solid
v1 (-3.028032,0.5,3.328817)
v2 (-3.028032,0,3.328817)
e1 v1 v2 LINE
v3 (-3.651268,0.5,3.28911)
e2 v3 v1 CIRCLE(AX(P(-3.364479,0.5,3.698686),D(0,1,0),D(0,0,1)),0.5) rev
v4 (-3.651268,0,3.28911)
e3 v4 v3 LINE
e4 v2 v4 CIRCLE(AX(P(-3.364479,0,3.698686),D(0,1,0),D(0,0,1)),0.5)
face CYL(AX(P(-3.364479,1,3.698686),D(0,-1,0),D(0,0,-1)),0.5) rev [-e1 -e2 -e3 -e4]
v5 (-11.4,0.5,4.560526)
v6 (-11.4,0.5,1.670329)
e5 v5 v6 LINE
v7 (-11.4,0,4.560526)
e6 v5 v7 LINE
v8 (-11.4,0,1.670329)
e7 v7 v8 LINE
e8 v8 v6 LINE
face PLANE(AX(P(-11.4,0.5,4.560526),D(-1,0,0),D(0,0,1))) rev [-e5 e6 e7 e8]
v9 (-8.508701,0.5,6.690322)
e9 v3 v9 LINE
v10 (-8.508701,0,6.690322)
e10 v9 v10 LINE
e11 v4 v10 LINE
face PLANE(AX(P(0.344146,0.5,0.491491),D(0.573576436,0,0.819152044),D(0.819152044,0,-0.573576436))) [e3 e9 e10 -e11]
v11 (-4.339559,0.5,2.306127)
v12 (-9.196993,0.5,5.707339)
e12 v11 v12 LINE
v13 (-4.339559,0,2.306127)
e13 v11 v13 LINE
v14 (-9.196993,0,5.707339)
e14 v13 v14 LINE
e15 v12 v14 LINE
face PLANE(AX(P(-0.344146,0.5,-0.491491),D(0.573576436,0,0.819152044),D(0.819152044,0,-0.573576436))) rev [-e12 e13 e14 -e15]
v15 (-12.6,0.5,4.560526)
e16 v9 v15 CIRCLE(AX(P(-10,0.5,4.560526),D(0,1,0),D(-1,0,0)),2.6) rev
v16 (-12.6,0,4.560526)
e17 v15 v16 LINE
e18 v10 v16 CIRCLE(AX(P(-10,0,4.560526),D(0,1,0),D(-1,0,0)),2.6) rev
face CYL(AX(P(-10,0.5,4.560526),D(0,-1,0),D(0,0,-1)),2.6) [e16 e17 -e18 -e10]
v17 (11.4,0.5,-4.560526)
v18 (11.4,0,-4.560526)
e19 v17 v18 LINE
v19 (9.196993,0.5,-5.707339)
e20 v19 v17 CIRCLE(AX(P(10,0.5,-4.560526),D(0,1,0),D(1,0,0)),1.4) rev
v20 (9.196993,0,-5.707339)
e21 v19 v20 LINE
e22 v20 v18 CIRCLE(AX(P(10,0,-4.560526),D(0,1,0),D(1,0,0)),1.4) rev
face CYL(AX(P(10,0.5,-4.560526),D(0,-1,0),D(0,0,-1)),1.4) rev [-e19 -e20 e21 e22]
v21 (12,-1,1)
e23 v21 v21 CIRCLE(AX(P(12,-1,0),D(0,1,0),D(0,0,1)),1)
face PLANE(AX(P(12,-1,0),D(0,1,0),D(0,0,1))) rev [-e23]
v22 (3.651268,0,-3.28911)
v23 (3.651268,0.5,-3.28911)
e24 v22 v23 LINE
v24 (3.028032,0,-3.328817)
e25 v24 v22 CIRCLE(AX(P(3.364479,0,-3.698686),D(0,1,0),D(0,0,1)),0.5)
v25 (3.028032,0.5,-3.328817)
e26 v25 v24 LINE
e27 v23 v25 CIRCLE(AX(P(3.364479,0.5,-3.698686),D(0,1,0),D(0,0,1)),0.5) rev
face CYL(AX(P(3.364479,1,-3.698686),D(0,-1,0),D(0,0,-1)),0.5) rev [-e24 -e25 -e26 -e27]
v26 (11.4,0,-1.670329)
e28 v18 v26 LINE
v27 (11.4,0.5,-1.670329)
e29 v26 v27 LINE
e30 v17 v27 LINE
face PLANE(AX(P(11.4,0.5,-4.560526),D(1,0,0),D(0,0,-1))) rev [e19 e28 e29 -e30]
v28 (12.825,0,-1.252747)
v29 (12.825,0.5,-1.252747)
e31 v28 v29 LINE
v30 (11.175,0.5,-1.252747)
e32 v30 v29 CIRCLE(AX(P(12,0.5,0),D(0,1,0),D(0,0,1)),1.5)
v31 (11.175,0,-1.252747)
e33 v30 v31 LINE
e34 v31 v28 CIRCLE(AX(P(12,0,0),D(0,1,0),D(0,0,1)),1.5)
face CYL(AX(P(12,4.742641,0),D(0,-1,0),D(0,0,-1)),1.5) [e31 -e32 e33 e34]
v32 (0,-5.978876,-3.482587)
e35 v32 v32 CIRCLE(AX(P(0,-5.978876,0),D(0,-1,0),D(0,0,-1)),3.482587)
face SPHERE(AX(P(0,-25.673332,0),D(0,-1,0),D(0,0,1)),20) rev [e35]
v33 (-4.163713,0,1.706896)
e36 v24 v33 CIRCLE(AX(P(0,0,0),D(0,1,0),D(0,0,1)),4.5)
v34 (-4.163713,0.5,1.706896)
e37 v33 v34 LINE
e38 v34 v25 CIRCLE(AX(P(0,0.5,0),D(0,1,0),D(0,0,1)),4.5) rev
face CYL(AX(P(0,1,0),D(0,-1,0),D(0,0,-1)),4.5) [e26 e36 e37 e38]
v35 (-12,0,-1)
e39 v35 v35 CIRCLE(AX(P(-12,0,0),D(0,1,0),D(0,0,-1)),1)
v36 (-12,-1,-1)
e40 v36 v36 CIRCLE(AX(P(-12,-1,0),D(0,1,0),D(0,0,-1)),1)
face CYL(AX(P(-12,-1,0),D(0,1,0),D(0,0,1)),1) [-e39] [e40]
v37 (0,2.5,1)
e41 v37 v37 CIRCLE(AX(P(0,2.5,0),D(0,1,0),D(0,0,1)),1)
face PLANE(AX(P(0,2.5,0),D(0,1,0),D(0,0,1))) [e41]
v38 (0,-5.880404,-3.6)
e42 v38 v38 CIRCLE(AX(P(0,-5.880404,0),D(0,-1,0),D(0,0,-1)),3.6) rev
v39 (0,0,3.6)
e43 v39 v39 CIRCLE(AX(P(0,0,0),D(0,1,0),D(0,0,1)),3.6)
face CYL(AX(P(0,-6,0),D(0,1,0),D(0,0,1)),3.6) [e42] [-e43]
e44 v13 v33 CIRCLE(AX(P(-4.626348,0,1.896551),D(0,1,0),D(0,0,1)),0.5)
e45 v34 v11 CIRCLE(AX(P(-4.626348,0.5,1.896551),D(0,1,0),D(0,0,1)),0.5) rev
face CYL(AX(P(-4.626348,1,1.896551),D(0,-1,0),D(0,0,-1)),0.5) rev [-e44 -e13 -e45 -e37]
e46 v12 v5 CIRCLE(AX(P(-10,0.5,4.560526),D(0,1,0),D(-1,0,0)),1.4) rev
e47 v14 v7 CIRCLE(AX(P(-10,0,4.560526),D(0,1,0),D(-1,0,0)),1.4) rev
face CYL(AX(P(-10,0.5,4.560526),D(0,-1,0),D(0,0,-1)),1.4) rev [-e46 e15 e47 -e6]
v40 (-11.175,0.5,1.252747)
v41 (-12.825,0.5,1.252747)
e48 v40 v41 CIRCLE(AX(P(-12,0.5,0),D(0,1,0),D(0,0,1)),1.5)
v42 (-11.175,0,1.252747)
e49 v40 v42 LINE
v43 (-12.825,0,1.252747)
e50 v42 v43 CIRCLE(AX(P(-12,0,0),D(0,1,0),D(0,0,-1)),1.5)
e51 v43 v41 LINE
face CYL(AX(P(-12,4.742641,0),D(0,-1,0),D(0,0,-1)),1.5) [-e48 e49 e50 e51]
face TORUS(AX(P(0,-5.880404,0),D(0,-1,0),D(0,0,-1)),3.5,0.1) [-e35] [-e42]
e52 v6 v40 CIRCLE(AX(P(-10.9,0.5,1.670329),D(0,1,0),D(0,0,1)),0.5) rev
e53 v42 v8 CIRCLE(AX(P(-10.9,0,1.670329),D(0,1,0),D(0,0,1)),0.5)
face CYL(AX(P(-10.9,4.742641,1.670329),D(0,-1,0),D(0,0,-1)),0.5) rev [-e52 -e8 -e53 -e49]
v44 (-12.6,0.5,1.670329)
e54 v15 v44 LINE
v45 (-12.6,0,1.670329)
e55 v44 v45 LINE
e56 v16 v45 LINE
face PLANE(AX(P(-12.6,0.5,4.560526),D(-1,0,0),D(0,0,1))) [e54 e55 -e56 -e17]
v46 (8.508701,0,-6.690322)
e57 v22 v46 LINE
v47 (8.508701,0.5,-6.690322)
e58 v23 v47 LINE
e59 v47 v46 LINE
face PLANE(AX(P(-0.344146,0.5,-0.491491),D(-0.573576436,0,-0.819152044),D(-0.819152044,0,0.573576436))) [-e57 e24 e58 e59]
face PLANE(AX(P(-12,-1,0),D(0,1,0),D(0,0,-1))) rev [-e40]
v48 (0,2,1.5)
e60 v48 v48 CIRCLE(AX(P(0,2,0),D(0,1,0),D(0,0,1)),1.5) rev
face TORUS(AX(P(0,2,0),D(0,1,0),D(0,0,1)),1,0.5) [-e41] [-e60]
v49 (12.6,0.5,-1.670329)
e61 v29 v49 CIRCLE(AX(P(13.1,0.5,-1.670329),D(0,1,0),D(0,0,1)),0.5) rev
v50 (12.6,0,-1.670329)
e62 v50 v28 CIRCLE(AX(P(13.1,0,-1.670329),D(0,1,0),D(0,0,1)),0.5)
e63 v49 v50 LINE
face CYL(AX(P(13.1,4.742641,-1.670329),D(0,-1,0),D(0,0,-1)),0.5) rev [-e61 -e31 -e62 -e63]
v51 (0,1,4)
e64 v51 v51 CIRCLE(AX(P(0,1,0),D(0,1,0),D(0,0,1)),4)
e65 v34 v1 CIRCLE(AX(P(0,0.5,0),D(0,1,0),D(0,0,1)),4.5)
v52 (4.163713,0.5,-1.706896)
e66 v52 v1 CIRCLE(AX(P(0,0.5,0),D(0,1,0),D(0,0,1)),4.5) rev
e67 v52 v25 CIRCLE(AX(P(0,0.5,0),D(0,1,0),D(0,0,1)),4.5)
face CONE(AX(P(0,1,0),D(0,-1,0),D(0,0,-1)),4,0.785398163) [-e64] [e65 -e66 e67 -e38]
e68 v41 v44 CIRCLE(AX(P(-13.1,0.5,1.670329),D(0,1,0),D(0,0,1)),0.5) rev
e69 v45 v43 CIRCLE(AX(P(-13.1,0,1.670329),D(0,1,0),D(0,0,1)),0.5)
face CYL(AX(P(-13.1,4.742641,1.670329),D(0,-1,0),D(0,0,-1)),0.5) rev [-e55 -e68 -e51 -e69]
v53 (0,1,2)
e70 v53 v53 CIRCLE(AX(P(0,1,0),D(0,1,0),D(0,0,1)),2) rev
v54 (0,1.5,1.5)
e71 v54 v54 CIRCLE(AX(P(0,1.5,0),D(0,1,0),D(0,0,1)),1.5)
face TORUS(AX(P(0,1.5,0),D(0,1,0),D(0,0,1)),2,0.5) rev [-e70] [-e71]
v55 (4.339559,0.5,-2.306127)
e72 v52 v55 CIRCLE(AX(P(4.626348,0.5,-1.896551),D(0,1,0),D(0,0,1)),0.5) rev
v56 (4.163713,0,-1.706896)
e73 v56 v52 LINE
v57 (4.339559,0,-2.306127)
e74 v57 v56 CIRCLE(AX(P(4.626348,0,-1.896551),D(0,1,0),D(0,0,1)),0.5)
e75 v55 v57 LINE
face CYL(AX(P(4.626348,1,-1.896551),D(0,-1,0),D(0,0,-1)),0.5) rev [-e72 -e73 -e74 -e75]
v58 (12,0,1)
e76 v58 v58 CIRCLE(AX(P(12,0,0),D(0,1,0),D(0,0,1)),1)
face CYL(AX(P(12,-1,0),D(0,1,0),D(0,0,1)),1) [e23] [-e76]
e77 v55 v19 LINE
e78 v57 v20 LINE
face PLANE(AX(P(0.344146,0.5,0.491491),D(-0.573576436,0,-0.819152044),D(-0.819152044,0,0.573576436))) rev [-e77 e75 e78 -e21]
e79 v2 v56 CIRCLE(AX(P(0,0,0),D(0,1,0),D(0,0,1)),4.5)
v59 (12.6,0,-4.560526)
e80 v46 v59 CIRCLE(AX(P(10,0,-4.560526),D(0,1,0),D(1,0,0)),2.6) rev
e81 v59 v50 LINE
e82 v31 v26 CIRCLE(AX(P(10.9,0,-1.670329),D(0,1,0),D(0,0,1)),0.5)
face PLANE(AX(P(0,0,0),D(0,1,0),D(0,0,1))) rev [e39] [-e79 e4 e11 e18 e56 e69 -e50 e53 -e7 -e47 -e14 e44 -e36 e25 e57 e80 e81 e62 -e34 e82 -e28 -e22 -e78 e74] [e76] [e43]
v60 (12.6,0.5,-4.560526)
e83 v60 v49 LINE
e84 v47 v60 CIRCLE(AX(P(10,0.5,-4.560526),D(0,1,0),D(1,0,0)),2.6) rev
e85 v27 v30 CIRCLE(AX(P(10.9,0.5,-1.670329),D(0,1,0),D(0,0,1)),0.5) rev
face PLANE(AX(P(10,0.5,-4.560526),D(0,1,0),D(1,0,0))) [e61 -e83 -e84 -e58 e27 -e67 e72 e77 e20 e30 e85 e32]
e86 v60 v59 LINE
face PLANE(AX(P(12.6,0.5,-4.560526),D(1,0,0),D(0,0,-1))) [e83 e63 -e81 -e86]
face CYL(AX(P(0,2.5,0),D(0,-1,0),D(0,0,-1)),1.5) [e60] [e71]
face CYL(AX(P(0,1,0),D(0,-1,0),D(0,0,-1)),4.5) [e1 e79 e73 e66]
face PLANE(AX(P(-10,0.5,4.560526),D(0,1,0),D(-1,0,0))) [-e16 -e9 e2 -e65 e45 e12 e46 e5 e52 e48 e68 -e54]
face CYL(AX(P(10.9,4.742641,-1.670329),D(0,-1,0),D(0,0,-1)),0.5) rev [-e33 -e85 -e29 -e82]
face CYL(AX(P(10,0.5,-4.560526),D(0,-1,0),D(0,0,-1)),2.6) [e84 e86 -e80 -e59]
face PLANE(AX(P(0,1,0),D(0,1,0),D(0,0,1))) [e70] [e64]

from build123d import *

# Parameters (mm, degrees)
SKETCH1_R                = 3.6
BOSS_EXTRUDE1_DEPTH      = 6
SKETCH2_R                = 4.5
BOSS_EXTRUDE2_DEPTH      = 1
EXTRUDE_THIN1_DEPTH      = 0.5
SKETCH4_R                = 1.5
BOSS_EXTRUDE3_DEPTH      = 0.5
SKETCH5_R                = 1
BOSS_EXTRUDE4_DEPTH      = 1
FILLET1_R                = 0.5
CIRPATTERN1_COUNT        = 2
FILLET1_OF_CIRPATTERN1_R = 0.5
CHAMFER1_SIZE            = 0.5
SKETCH6_R                = 1.5
BOSS_EXTRUDE5_DEPTH      = 1.5
FILLET2_R                = 0.5
FILLET3_R                = 0.1
FILLET4_R                = 0.5


with BuildPart() as part:
    # Sketch1 → Boss-Extrude1 (new body)
    with BuildSketch(Plane(origin=(0, 0, 0), x_dir=(1, 0, 0), z_dir=(0, 1, 0))):
        with Locations(Location((0, 0, 0), (0, 0, 270))):
            Circle(SKETCH1_R)
    extrude(amount=-BOSS_EXTRUDE1_DEPTH)

    # Sketch2 → Boss-Extrude2 (add)
    with BuildSketch(Plane(origin=(0, 0, 0), x_dir=(1, 0, 0), z_dir=(0, 1, 0))):
        with Locations(Location((0, 0, 0), (0, 0, 270))):
            Circle(SKETCH2_R)
    extrude(amount=BOSS_EXTRUDE2_DEPTH)

    # Sketch3 → Extrude-Thin1 (add)
    with BuildSketch(Plane(origin=(0, 0, 0), x_dir=(1, 0, 0), z_dir=(0, 1, 0))):
        with BuildLine():
            Line((0.344145862, -0.491491227), (9.196992989, 5.707339067))
            ThreePointArc((9.196992989, 5.707339067), (10.646448059, 5.802341371), (11.4, 4.560526205))
            Line((11.4, 4.560526205), (11.4, 0))
            Line((11.4, 0), (12.6, 0))
            Line((12.6, 0), (12.6, 4.560526205))
            ThreePointArc((12.6, 4.560526205), (11.200546394, 6.866754371), (8.508701265, 6.69032152))
            Line((8.508701265, 6.69032152), (-0.344145862, 0.491491227))
            Line((-0.344145862, 0.491491227), (0.344145862, -0.491491227))
        make_face()
    extrude_thin1 = extrude(amount=EXTRUDE_THIN1_DEPTH)

    # Sketch4 → Boss-Extrude3 (add)
    with BuildSketch(Plane(origin=(0, 0, 0), x_dir=(1, 0, 0), z_dir=(0, 1, 0))):
        with Locations((12, 0)):
            Circle(SKETCH4_R)
    boss_extrude3 = extrude(amount=BOSS_EXTRUDE3_DEPTH)

    # Sketch5 → Boss-Extrude4 (add)
    with BuildSketch(Plane(origin=(0, 0, 0), x_dir=(1, 0, 0), z_dir=(0, 1, 0))):
        with Locations(Location((12, 0, 0), (0, 0, 270))):
            Circle(SKETCH5_R)
    boss_extrude4 = extrude(amount=-BOSS_EXTRUDE4_DEPTH)

    # Fillet1
    fillet1_edges = [part.edges().sort_by_distance(p)[0] for p in [
        (3.997417043, 0.25, -2.066556794),
        (3.30912532, 0.25, -3.049539247),
        (11.4, 0.25, -1.374772708),
        (12.6, 0.25, -1.374772708),
    ]]
    fillet(fillet1_edges, radius=FILLET1_R)

    # CirPattern1: Extrude-Thin1, Boss-Extrude3, Boss-Extrude4 ×2 about axis
    cirpattern1_axis = Axis((0, 0, 0), (0, 1, 0))
    add([extrude_thin1.rotate(cirpattern1_axis, i * 360 / CIRPATTERN1_COUNT) for i in range(1, CIRPATTERN1_COUNT)])
    add([boss_extrude3.rotate(cirpattern1_axis, i * 360 / CIRPATTERN1_COUNT) for i in range(1, CIRPATTERN1_COUNT)])
    add([boss_extrude4.rotate(cirpattern1_axis, i * 360 / CIRPATTERN1_COUNT) for i in range(1, CIRPATTERN1_COUNT)])

    # Fillet1 of CirPattern1
    fillet1_of_cirpattern1_edges = [part.edges().sort_by_distance(p)[0] for p in [
        (-3.997417043, 0.25, 2.066556794),
        (-3.30912532, 0.25, 3.049539247),
        (-11.4, 0.25, 1.374772708),
        (-12.6, 0.25, 1.374772708),
    ]]
    fillet(fillet1_of_cirpattern1_edges, radius=FILLET1_OF_CIRPATTERN1_R)

    # Chamfer1
    chamfer1_edges = [part.edges().sort_by_distance(p)[0] for p in [
        (0, 1, -4.5),
    ]]
    chamfer(chamfer1_edges, length=CHAMFER1_SIZE - 0.0001)  # a hair under: the kernel refuses the full size

    # Sketch6 → Boss-Extrude5 (add)
    with BuildSketch(Plane(origin=(0, 1, 0), x_dir=(1, 0, 0), z_dir=(0, 1, 0))):
        with Locations(Location((0, 0, 0), (0, 0, 270))):
            Circle(SKETCH6_R)
    extrude(amount=BOSS_EXTRUDE5_DEPTH)

    # Fillet2
    fillet2_edges = [part.edges().sort_by_distance(p)[0] for p in [
        (0, 2.5, -1.5),
    ]]
    fillet(fillet2_edges, radius=FILLET2_R)

    # Sketch7 → Cut-Revolve1 (revolve, cut)
    with BuildSketch(Plane(origin=(0, 0, 0), x_dir=(0, 0, -1), z_dir=(1, 0, 0)), mode=Mode.PRIVATE) as cut_revolve1_sk:
        with BuildLine():
            Line((0, -6), (0, -5.673332204))
            ThreePointArc((0, -5.673332204), (-1.807395353, -5.755166574), (-3.6, -6))
            Line((-3.6, -6), (0, -6))
        make_face()
    revolve(cut_revolve1_sk.sketch.rotate(Axis((0, -6, 0), (0, 1, 0)), 137.709032994), axis=Axis((0, -6, 0), (0, 1, 0)), mode=Mode.SUBTRACT)

    # Fillet3
    fillet3_edges = [part.edges().sort_by_distance(p)[0] for p in [
        (-3.357602864, -6, -1.298654307),
    ]]
    fillet(fillet3_edges, radius=FILLET3_R)

    # Fillet4
    fillet4_edges = [part.edges().sort_by_distance(p)[0] for p in [
        (0, 1, -1.5),
    ]]
    fillet(fillet4_edges, radius=FILLET4_R)


solid = part.part
